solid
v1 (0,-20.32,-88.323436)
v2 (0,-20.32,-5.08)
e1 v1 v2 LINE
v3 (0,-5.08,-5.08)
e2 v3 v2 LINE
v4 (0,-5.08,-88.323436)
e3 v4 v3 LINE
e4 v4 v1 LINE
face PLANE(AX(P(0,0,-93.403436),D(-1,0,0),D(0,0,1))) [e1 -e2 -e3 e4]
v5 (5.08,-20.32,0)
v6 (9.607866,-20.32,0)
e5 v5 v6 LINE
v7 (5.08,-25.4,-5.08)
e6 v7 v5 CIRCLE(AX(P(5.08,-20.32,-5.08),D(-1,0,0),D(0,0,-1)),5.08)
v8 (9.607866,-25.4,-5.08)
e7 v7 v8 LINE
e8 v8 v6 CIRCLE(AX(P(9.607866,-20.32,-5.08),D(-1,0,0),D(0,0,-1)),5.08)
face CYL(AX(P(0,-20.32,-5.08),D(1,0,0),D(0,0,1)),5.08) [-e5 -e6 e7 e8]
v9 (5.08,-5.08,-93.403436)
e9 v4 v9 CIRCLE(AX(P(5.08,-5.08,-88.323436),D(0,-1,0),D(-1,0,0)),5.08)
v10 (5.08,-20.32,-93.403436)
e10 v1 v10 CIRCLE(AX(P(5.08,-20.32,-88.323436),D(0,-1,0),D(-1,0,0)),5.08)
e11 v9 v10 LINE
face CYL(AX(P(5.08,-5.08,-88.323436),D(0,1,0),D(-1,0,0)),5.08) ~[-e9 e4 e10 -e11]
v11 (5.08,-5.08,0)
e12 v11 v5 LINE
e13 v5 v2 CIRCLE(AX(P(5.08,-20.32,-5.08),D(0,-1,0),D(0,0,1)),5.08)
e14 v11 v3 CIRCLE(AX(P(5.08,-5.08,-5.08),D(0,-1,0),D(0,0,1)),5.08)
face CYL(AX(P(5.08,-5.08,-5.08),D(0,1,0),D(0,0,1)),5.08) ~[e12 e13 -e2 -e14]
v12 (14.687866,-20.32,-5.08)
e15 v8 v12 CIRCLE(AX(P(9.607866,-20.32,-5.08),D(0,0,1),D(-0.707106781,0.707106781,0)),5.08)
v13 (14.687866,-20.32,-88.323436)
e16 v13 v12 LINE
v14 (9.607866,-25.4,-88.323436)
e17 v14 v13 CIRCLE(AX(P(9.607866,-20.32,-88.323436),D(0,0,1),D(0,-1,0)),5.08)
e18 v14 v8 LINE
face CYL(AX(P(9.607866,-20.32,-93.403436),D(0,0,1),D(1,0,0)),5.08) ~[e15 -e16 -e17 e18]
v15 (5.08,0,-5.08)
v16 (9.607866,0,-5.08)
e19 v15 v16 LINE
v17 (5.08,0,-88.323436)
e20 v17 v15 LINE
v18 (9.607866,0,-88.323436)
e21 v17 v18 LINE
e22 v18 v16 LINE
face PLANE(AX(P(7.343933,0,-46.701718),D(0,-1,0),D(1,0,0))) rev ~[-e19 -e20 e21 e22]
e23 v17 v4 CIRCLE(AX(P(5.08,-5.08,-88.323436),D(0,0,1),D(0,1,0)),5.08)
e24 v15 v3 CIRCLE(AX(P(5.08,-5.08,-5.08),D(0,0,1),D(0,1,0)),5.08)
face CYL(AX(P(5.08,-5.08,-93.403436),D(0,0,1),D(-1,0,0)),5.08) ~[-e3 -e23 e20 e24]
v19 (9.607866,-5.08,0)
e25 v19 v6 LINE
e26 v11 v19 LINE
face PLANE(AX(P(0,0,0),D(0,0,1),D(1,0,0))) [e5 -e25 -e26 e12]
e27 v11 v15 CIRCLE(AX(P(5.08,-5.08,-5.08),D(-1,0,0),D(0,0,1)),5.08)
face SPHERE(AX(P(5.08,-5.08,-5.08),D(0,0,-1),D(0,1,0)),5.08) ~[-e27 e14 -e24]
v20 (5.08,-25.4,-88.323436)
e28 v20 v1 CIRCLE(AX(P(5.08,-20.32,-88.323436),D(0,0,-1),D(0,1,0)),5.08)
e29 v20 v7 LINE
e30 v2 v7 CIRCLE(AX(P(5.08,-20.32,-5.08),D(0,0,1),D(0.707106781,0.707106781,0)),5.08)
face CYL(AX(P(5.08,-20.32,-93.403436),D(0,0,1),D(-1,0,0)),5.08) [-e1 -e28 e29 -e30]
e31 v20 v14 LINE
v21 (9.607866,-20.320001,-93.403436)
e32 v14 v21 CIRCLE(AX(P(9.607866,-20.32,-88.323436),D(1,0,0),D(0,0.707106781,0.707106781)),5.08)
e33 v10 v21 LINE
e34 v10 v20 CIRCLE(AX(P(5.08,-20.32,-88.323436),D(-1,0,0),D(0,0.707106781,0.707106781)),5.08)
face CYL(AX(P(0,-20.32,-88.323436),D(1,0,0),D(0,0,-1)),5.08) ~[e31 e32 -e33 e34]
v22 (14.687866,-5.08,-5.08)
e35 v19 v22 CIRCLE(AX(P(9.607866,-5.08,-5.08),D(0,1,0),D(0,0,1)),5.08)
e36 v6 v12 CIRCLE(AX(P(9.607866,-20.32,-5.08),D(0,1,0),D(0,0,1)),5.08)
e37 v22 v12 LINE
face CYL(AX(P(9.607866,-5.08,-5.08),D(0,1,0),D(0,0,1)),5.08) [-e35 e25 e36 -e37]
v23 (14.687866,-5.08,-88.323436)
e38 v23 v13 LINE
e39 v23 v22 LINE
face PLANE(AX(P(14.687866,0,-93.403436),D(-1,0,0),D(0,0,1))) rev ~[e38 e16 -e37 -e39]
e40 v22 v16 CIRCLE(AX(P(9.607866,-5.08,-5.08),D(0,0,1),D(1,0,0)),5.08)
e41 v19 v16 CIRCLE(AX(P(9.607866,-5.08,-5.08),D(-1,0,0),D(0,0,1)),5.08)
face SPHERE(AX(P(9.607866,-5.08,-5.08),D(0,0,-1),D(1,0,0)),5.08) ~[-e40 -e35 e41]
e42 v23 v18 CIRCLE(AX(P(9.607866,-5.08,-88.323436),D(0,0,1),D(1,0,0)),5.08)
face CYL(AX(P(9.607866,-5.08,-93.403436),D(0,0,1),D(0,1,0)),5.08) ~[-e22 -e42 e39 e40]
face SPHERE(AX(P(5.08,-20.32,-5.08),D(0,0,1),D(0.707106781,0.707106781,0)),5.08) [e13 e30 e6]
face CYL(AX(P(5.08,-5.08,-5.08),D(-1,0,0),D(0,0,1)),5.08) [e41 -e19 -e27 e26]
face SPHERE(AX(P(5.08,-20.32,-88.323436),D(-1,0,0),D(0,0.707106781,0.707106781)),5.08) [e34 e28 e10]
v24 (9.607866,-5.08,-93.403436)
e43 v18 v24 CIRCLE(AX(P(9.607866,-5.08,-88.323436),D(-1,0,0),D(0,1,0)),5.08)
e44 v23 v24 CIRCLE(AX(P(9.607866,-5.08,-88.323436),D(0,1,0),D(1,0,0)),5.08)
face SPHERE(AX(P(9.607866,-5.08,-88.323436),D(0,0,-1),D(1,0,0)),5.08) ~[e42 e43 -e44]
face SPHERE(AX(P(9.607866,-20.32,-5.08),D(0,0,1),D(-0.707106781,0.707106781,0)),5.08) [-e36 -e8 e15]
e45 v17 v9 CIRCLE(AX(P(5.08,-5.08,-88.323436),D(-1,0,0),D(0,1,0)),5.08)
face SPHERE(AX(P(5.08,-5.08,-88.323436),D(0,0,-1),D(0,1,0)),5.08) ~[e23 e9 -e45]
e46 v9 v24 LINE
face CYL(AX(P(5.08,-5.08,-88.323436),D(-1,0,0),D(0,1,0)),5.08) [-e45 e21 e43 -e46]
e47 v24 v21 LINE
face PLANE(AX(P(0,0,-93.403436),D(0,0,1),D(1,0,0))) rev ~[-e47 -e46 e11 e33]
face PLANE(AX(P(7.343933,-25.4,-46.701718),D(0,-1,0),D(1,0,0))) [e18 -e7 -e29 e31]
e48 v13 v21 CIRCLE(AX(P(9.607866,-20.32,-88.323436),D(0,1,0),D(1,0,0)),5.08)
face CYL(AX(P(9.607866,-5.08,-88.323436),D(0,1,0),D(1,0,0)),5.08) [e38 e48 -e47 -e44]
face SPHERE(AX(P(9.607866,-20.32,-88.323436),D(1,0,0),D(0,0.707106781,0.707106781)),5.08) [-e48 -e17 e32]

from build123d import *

# Parameters (mm, degrees)
F0_W         = 14.6878659725
F0_H         = 93.4034362435
F1_DEPTH     = 25.4
F2_R         = 5.08
F3_R         = 5.08
F4_T1_DEPTH  = 4.5278659725
F4_T3_DEPTH  = 15.24
F4_S7_W      = 5.08
F4_S7_H      = 5.08
F4_T8_DEPTH  = 5.08
F4_S13_W     = 5.08
F4_S13_H     = 5.08
F4_T14_DEPTH = 5.08
F4_S19_W     = 5.08
F4_S19_H     = 5.08
F4_T20_DEPTH = 5.08
F4_S25_W     = 5.08
F4_S25_H     = 5.08
F4_T26_DEPTH = 5.08
F4_T30_ANGLE = 90
F4_T32_ANGLE = 90
F4_T34_ANGLE = 90
F4_T36_ANGLE = 90


# Not quite as in the source:
# - a fillet or chamfer that OpenCascade refuses, or shapes differently, is made with other operations: its cross-section is extruded or revolved along the edge and cut away or added


with BuildPart() as f1:
    # F0 (on Front) → F1 (new body)
    with BuildSketch(Plane.XZ):
        with Locations((7.3439329863, -46.7017181218)):
            Rectangle(F0_W, F0_H)
    extrude(amount=F1_DEPTH)

    # F2
    f2_edges = [f1.edges().sort_by_distance(p)[0] for p in [
        (14.687866, -25.4, -46.701718),
        (7.343933, -25.4, 0),
        (0, -25.4, -46.701718),
        (7.343933, -25.4, -93.403436),
    ]]
    fillet(f2_edges, radius=F2_R)

    # F3
    f3_edges = [f1.edges().sort_by_distance(p)[0] for p in [
        (14.687866, 0, -46.701718),
        (0, 0, -46.701718),
    ]]
    fillet(f3_edges, radius=F3_R)

    # F4: fillet of radius 5.08 on 2 edges, made by hand

    # F4_s2 → F4_t1 (cut)
    with BuildSketch(Plane.YZ.offset(5.08)):
        with BuildLine():
            ThreePointArc((0, -88.3234362435), (-1.4878975516, -91.915538692), (-5.08, -93.4034362435))
            Line((-5.08, -93.4034362435), (0, -93.4034362435))
            Line((0, -93.4034362435), (0, -88.3234362435))
        make_face()
        with BuildLine():
            ThreePointArc((-5.08, 0), (-1.4878975516, -1.4878975516), (0, -5.08))
            Line((0, -5.08), (0, 0))
            Line((0, 0), (-5.08, 0))
        make_face()
    extrude(amount=F4_T1_DEPTH, mode=Mode.SUBTRACT)

    # F4_s4 → F4_t3 (cut)
    with BuildSketch(Plane.XZ.offset(5.08)):
        with BuildLine():
            ThreePointArc((5.08, 0), (1.4878975516, -1.4878975516), (0, -5.08))
            Line((0, -5.08), (0, 0))
            Line((0, 0), (5.08, 0))
        make_face()
        with BuildLine():
            ThreePointArc((9.6078659725, 0), (13.1999684209, -1.4878975516), (14.6878659725, -5.08))
            Line((14.6878659725, -5.08), (14.6878659725, 0))
            Line((14.6878659725, 0), (9.6078659725, 0))
        make_face()
        with BuildLine():
            ThreePointArc((14.6878659725, -88.3234362435), (13.1999684209, -91.915538692), (9.6078659725, -93.4034362435))
            Line((9.6078659725, -93.4034362435), (14.6878659725, -93.4034362435))
            Line((14.6878659725, -93.4034362435), (14.6878659725, -88.3234362435))
        make_face()
        with BuildLine():
            ThreePointArc((0, -88.3234362435), (1.4878975516, -91.915538692), (5.08, -93.4034362435))
            Line((5.08, -93.4034362435), (0, -93.4034362435))
            Line((0, -93.4034362435), (0, -88.3234362435))
        make_face()
    extrude(amount=F4_T3_DEPTH, mode=Mode.SUBTRACT)


with BuildPart() as f4_tool6:
    # F4_s7 → F4_t8 (new body)
    with BuildSketch(Plane.XY.offset(-5.08)):
        with Locations((2.54, -22.86)):
            Rectangle(F4_S7_W, F4_S7_H)
    extrude(amount=F4_T8_DEPTH)

    # F4_s9 → F4_t10 (revolve, cut)
    with BuildSketch(Plane(origin=(5.08, -20.32, -5.08), x_dir=(0.7071067812, 0.7071067812, 0), z_dir=(0.7071067812, -0.7071067812, 0))):
        with BuildLine():
            ThreePointArc((0, -5.08), (5.08, 0), (0, 5.08))
            Line((0, 5.08), (0, -5.08))
        make_face()
    revolve(axis=Axis((5.08, -20.32, -5.08), (0, 0, 1)), mode=Mode.SUBTRACT)


with BuildPart() as f1_1:
    add(f1.part)

    # F4_t5: cut F4_tool6
    add(f4_tool6.part, mode=Mode.SUBTRACT)


with BuildPart() as f4_tool12:
    # F4_s13 → F4_t14 (new body)
    with BuildSketch(Plane.XY.offset(-5.08)):
        with Locations((12.1478659725, -22.86)):
            Rectangle(F4_S13_W, F4_S13_H)
    extrude(amount=F4_T14_DEPTH)

    # F4_s15 → F4_t16 (revolve, cut)
    with BuildSketch(Plane(origin=(9.6078659725, -20.32, -5.08), x_dir=(-0.7071067812, 0.7071067812, 0), z_dir=(0.7071067812, 0.7071067812, 0))):
        with BuildLine():
            ThreePointArc((0, -5.08), (5.08, 0), (0, 5.08))
            Line((0, 5.08), (0, -5.08))
        make_face()
    revolve(axis=Axis((9.6078659725, -20.32, -5.08), (0, 0, 1)), mode=Mode.SUBTRACT)


with BuildPart() as f1_2:
    add(f1_1.part)

    # F4_t11: cut F4_tool12
    add(f4_tool12.part, mode=Mode.SUBTRACT)


with BuildPart() as f4_tool18:
    # F4_s19 → F4_t20 (new body)
    with BuildSketch(Plane.YZ.offset(9.6078659725)):
        with Locations((-22.86, -90.8634362435)):
            Rectangle(F4_S19_W, F4_S19_H)
    extrude(amount=F4_T20_DEPTH)

    # F4_s21 → F4_t22 (revolve, cut)
    with BuildSketch(Plane(origin=(9.6078659725, -20.32, -88.3234362435), x_dir=(0, 0.7071067812, 0.7071067812), z_dir=(0, 0.7071067812, -0.7071067812))):
        with BuildLine():
            ThreePointArc((0, -5.08), (5.08, 0), (0, 5.08))
            Line((0, 5.08), (0, -5.08))
        make_face()
    revolve(axis=Axis((9.6078659725, -20.32, -88.3234362435), (1, 0, 0)), mode=Mode.SUBTRACT)


with BuildPart() as f1_3:
    add(f1_2.part)

    # F4_t17: cut F4_tool18
    add(f4_tool18.part, mode=Mode.SUBTRACT)


with BuildPart() as f4_tool24:
    # F4_s25 → F4_t26 (new body)
    with BuildSketch(Plane.YZ.offset(5.08)):
        with Locations((-22.86, -90.8634362435)):
            Rectangle(F4_S25_W, F4_S25_H)
    extrude(amount=-F4_T26_DEPTH)

    # F4_s27 → F4_t28 (revolve, cut)
    with BuildSketch(Plane(origin=(5.08, -20.32, -88.3234362435), x_dir=(0, 0.7071067812, 0.7071067812), z_dir=(0, -0.7071067812, 0.7071067812))):
        with BuildLine():
            ThreePointArc((0, -5.08), (5.08, 0), (0, 5.08))
            Line((0, 5.08), (0, -5.08))
        make_face()
    revolve(axis=Axis((5.08, -20.32, -88.3234362435), (-1, 0, 0)), mode=Mode.SUBTRACT)


with BuildPart() as f1_4:
    add(f1_3.part)

    # F4_t23: cut F4_tool24
    add(f4_tool24.part, mode=Mode.SUBTRACT)

    # F4_s29 → F4_t30 (revolve, cut)
    with BuildSketch(Plane.XZ.offset(5.08)):
        with BuildLine():
            ThreePointArc((9.6078659725, 0), (13.1999684209, -1.4878975516), (14.6878659725, -5.08))
            Line((14.6878659725, -5.08), (14.6878659725, 0))
            Line((14.6878659725, 0), (9.6078659725, 0))
        make_face()
    revolve(axis=Axis((9.6078659725, -5.08, 0), (0, 0, 1)), revolution_arc=F4_T30_ANGLE, mode=Mode.SUBTRACT)

    # F4_s31 → F4_t32 (revolve, cut)
    with BuildSketch(Plane.YZ.offset(5.08)):
        with BuildLine():
            ThreePointArc((-5.08, 0), (-1.4878975516, -1.4878975516), (0, -5.08))
            Line((0, -5.08), (0, 0))
            Line((0, 0), (-5.08, 0))
        make_face()
    revolve(axis=Axis((5.08, -5.08, 0), (0, 0, 1)), revolution_arc=F4_T32_ANGLE, mode=Mode.SUBTRACT)

    # F4_s33 → F4_t34 (revolve, cut)
    with BuildSketch(Plane.YZ.offset(5.08)):
        with BuildLine():
            ThreePointArc((0, -88.3234362435), (-1.4878975516, -91.915538692), (-5.08, -93.4034362435))
            Line((-5.08, -93.4034362435), (0, -93.4034362435))
            Line((0, -93.4034362435), (0, -88.3234362435))
        make_face()
    revolve(axis=Axis((5.08, -5.08, -93.4034362435), (0, 0, 1)), revolution_arc=F4_T34_ANGLE, mode=Mode.SUBTRACT)

    # F4_s35 → F4_t36 (revolve, cut)
    with BuildSketch(Plane.XZ.offset(5.08)):
        with BuildLine():
            ThreePointArc((14.6878659725, -88.3234362435), (13.1999684209, -91.915538692), (9.6078659725, -93.4034362435))
            Line((9.6078659725, -93.4034362435), (14.6878659725, -93.4034362435))
            Line((14.6878659725, -93.4034362435), (14.6878659725, -88.3234362435))
        make_face()
    revolve(axis=Axis((9.6078659725, -5.08, -93.4034362435), (0, 0, 1)), revolution_arc=F4_T36_ANGLE, mode=Mode.SUBTRACT)


solid = f1_4.part
